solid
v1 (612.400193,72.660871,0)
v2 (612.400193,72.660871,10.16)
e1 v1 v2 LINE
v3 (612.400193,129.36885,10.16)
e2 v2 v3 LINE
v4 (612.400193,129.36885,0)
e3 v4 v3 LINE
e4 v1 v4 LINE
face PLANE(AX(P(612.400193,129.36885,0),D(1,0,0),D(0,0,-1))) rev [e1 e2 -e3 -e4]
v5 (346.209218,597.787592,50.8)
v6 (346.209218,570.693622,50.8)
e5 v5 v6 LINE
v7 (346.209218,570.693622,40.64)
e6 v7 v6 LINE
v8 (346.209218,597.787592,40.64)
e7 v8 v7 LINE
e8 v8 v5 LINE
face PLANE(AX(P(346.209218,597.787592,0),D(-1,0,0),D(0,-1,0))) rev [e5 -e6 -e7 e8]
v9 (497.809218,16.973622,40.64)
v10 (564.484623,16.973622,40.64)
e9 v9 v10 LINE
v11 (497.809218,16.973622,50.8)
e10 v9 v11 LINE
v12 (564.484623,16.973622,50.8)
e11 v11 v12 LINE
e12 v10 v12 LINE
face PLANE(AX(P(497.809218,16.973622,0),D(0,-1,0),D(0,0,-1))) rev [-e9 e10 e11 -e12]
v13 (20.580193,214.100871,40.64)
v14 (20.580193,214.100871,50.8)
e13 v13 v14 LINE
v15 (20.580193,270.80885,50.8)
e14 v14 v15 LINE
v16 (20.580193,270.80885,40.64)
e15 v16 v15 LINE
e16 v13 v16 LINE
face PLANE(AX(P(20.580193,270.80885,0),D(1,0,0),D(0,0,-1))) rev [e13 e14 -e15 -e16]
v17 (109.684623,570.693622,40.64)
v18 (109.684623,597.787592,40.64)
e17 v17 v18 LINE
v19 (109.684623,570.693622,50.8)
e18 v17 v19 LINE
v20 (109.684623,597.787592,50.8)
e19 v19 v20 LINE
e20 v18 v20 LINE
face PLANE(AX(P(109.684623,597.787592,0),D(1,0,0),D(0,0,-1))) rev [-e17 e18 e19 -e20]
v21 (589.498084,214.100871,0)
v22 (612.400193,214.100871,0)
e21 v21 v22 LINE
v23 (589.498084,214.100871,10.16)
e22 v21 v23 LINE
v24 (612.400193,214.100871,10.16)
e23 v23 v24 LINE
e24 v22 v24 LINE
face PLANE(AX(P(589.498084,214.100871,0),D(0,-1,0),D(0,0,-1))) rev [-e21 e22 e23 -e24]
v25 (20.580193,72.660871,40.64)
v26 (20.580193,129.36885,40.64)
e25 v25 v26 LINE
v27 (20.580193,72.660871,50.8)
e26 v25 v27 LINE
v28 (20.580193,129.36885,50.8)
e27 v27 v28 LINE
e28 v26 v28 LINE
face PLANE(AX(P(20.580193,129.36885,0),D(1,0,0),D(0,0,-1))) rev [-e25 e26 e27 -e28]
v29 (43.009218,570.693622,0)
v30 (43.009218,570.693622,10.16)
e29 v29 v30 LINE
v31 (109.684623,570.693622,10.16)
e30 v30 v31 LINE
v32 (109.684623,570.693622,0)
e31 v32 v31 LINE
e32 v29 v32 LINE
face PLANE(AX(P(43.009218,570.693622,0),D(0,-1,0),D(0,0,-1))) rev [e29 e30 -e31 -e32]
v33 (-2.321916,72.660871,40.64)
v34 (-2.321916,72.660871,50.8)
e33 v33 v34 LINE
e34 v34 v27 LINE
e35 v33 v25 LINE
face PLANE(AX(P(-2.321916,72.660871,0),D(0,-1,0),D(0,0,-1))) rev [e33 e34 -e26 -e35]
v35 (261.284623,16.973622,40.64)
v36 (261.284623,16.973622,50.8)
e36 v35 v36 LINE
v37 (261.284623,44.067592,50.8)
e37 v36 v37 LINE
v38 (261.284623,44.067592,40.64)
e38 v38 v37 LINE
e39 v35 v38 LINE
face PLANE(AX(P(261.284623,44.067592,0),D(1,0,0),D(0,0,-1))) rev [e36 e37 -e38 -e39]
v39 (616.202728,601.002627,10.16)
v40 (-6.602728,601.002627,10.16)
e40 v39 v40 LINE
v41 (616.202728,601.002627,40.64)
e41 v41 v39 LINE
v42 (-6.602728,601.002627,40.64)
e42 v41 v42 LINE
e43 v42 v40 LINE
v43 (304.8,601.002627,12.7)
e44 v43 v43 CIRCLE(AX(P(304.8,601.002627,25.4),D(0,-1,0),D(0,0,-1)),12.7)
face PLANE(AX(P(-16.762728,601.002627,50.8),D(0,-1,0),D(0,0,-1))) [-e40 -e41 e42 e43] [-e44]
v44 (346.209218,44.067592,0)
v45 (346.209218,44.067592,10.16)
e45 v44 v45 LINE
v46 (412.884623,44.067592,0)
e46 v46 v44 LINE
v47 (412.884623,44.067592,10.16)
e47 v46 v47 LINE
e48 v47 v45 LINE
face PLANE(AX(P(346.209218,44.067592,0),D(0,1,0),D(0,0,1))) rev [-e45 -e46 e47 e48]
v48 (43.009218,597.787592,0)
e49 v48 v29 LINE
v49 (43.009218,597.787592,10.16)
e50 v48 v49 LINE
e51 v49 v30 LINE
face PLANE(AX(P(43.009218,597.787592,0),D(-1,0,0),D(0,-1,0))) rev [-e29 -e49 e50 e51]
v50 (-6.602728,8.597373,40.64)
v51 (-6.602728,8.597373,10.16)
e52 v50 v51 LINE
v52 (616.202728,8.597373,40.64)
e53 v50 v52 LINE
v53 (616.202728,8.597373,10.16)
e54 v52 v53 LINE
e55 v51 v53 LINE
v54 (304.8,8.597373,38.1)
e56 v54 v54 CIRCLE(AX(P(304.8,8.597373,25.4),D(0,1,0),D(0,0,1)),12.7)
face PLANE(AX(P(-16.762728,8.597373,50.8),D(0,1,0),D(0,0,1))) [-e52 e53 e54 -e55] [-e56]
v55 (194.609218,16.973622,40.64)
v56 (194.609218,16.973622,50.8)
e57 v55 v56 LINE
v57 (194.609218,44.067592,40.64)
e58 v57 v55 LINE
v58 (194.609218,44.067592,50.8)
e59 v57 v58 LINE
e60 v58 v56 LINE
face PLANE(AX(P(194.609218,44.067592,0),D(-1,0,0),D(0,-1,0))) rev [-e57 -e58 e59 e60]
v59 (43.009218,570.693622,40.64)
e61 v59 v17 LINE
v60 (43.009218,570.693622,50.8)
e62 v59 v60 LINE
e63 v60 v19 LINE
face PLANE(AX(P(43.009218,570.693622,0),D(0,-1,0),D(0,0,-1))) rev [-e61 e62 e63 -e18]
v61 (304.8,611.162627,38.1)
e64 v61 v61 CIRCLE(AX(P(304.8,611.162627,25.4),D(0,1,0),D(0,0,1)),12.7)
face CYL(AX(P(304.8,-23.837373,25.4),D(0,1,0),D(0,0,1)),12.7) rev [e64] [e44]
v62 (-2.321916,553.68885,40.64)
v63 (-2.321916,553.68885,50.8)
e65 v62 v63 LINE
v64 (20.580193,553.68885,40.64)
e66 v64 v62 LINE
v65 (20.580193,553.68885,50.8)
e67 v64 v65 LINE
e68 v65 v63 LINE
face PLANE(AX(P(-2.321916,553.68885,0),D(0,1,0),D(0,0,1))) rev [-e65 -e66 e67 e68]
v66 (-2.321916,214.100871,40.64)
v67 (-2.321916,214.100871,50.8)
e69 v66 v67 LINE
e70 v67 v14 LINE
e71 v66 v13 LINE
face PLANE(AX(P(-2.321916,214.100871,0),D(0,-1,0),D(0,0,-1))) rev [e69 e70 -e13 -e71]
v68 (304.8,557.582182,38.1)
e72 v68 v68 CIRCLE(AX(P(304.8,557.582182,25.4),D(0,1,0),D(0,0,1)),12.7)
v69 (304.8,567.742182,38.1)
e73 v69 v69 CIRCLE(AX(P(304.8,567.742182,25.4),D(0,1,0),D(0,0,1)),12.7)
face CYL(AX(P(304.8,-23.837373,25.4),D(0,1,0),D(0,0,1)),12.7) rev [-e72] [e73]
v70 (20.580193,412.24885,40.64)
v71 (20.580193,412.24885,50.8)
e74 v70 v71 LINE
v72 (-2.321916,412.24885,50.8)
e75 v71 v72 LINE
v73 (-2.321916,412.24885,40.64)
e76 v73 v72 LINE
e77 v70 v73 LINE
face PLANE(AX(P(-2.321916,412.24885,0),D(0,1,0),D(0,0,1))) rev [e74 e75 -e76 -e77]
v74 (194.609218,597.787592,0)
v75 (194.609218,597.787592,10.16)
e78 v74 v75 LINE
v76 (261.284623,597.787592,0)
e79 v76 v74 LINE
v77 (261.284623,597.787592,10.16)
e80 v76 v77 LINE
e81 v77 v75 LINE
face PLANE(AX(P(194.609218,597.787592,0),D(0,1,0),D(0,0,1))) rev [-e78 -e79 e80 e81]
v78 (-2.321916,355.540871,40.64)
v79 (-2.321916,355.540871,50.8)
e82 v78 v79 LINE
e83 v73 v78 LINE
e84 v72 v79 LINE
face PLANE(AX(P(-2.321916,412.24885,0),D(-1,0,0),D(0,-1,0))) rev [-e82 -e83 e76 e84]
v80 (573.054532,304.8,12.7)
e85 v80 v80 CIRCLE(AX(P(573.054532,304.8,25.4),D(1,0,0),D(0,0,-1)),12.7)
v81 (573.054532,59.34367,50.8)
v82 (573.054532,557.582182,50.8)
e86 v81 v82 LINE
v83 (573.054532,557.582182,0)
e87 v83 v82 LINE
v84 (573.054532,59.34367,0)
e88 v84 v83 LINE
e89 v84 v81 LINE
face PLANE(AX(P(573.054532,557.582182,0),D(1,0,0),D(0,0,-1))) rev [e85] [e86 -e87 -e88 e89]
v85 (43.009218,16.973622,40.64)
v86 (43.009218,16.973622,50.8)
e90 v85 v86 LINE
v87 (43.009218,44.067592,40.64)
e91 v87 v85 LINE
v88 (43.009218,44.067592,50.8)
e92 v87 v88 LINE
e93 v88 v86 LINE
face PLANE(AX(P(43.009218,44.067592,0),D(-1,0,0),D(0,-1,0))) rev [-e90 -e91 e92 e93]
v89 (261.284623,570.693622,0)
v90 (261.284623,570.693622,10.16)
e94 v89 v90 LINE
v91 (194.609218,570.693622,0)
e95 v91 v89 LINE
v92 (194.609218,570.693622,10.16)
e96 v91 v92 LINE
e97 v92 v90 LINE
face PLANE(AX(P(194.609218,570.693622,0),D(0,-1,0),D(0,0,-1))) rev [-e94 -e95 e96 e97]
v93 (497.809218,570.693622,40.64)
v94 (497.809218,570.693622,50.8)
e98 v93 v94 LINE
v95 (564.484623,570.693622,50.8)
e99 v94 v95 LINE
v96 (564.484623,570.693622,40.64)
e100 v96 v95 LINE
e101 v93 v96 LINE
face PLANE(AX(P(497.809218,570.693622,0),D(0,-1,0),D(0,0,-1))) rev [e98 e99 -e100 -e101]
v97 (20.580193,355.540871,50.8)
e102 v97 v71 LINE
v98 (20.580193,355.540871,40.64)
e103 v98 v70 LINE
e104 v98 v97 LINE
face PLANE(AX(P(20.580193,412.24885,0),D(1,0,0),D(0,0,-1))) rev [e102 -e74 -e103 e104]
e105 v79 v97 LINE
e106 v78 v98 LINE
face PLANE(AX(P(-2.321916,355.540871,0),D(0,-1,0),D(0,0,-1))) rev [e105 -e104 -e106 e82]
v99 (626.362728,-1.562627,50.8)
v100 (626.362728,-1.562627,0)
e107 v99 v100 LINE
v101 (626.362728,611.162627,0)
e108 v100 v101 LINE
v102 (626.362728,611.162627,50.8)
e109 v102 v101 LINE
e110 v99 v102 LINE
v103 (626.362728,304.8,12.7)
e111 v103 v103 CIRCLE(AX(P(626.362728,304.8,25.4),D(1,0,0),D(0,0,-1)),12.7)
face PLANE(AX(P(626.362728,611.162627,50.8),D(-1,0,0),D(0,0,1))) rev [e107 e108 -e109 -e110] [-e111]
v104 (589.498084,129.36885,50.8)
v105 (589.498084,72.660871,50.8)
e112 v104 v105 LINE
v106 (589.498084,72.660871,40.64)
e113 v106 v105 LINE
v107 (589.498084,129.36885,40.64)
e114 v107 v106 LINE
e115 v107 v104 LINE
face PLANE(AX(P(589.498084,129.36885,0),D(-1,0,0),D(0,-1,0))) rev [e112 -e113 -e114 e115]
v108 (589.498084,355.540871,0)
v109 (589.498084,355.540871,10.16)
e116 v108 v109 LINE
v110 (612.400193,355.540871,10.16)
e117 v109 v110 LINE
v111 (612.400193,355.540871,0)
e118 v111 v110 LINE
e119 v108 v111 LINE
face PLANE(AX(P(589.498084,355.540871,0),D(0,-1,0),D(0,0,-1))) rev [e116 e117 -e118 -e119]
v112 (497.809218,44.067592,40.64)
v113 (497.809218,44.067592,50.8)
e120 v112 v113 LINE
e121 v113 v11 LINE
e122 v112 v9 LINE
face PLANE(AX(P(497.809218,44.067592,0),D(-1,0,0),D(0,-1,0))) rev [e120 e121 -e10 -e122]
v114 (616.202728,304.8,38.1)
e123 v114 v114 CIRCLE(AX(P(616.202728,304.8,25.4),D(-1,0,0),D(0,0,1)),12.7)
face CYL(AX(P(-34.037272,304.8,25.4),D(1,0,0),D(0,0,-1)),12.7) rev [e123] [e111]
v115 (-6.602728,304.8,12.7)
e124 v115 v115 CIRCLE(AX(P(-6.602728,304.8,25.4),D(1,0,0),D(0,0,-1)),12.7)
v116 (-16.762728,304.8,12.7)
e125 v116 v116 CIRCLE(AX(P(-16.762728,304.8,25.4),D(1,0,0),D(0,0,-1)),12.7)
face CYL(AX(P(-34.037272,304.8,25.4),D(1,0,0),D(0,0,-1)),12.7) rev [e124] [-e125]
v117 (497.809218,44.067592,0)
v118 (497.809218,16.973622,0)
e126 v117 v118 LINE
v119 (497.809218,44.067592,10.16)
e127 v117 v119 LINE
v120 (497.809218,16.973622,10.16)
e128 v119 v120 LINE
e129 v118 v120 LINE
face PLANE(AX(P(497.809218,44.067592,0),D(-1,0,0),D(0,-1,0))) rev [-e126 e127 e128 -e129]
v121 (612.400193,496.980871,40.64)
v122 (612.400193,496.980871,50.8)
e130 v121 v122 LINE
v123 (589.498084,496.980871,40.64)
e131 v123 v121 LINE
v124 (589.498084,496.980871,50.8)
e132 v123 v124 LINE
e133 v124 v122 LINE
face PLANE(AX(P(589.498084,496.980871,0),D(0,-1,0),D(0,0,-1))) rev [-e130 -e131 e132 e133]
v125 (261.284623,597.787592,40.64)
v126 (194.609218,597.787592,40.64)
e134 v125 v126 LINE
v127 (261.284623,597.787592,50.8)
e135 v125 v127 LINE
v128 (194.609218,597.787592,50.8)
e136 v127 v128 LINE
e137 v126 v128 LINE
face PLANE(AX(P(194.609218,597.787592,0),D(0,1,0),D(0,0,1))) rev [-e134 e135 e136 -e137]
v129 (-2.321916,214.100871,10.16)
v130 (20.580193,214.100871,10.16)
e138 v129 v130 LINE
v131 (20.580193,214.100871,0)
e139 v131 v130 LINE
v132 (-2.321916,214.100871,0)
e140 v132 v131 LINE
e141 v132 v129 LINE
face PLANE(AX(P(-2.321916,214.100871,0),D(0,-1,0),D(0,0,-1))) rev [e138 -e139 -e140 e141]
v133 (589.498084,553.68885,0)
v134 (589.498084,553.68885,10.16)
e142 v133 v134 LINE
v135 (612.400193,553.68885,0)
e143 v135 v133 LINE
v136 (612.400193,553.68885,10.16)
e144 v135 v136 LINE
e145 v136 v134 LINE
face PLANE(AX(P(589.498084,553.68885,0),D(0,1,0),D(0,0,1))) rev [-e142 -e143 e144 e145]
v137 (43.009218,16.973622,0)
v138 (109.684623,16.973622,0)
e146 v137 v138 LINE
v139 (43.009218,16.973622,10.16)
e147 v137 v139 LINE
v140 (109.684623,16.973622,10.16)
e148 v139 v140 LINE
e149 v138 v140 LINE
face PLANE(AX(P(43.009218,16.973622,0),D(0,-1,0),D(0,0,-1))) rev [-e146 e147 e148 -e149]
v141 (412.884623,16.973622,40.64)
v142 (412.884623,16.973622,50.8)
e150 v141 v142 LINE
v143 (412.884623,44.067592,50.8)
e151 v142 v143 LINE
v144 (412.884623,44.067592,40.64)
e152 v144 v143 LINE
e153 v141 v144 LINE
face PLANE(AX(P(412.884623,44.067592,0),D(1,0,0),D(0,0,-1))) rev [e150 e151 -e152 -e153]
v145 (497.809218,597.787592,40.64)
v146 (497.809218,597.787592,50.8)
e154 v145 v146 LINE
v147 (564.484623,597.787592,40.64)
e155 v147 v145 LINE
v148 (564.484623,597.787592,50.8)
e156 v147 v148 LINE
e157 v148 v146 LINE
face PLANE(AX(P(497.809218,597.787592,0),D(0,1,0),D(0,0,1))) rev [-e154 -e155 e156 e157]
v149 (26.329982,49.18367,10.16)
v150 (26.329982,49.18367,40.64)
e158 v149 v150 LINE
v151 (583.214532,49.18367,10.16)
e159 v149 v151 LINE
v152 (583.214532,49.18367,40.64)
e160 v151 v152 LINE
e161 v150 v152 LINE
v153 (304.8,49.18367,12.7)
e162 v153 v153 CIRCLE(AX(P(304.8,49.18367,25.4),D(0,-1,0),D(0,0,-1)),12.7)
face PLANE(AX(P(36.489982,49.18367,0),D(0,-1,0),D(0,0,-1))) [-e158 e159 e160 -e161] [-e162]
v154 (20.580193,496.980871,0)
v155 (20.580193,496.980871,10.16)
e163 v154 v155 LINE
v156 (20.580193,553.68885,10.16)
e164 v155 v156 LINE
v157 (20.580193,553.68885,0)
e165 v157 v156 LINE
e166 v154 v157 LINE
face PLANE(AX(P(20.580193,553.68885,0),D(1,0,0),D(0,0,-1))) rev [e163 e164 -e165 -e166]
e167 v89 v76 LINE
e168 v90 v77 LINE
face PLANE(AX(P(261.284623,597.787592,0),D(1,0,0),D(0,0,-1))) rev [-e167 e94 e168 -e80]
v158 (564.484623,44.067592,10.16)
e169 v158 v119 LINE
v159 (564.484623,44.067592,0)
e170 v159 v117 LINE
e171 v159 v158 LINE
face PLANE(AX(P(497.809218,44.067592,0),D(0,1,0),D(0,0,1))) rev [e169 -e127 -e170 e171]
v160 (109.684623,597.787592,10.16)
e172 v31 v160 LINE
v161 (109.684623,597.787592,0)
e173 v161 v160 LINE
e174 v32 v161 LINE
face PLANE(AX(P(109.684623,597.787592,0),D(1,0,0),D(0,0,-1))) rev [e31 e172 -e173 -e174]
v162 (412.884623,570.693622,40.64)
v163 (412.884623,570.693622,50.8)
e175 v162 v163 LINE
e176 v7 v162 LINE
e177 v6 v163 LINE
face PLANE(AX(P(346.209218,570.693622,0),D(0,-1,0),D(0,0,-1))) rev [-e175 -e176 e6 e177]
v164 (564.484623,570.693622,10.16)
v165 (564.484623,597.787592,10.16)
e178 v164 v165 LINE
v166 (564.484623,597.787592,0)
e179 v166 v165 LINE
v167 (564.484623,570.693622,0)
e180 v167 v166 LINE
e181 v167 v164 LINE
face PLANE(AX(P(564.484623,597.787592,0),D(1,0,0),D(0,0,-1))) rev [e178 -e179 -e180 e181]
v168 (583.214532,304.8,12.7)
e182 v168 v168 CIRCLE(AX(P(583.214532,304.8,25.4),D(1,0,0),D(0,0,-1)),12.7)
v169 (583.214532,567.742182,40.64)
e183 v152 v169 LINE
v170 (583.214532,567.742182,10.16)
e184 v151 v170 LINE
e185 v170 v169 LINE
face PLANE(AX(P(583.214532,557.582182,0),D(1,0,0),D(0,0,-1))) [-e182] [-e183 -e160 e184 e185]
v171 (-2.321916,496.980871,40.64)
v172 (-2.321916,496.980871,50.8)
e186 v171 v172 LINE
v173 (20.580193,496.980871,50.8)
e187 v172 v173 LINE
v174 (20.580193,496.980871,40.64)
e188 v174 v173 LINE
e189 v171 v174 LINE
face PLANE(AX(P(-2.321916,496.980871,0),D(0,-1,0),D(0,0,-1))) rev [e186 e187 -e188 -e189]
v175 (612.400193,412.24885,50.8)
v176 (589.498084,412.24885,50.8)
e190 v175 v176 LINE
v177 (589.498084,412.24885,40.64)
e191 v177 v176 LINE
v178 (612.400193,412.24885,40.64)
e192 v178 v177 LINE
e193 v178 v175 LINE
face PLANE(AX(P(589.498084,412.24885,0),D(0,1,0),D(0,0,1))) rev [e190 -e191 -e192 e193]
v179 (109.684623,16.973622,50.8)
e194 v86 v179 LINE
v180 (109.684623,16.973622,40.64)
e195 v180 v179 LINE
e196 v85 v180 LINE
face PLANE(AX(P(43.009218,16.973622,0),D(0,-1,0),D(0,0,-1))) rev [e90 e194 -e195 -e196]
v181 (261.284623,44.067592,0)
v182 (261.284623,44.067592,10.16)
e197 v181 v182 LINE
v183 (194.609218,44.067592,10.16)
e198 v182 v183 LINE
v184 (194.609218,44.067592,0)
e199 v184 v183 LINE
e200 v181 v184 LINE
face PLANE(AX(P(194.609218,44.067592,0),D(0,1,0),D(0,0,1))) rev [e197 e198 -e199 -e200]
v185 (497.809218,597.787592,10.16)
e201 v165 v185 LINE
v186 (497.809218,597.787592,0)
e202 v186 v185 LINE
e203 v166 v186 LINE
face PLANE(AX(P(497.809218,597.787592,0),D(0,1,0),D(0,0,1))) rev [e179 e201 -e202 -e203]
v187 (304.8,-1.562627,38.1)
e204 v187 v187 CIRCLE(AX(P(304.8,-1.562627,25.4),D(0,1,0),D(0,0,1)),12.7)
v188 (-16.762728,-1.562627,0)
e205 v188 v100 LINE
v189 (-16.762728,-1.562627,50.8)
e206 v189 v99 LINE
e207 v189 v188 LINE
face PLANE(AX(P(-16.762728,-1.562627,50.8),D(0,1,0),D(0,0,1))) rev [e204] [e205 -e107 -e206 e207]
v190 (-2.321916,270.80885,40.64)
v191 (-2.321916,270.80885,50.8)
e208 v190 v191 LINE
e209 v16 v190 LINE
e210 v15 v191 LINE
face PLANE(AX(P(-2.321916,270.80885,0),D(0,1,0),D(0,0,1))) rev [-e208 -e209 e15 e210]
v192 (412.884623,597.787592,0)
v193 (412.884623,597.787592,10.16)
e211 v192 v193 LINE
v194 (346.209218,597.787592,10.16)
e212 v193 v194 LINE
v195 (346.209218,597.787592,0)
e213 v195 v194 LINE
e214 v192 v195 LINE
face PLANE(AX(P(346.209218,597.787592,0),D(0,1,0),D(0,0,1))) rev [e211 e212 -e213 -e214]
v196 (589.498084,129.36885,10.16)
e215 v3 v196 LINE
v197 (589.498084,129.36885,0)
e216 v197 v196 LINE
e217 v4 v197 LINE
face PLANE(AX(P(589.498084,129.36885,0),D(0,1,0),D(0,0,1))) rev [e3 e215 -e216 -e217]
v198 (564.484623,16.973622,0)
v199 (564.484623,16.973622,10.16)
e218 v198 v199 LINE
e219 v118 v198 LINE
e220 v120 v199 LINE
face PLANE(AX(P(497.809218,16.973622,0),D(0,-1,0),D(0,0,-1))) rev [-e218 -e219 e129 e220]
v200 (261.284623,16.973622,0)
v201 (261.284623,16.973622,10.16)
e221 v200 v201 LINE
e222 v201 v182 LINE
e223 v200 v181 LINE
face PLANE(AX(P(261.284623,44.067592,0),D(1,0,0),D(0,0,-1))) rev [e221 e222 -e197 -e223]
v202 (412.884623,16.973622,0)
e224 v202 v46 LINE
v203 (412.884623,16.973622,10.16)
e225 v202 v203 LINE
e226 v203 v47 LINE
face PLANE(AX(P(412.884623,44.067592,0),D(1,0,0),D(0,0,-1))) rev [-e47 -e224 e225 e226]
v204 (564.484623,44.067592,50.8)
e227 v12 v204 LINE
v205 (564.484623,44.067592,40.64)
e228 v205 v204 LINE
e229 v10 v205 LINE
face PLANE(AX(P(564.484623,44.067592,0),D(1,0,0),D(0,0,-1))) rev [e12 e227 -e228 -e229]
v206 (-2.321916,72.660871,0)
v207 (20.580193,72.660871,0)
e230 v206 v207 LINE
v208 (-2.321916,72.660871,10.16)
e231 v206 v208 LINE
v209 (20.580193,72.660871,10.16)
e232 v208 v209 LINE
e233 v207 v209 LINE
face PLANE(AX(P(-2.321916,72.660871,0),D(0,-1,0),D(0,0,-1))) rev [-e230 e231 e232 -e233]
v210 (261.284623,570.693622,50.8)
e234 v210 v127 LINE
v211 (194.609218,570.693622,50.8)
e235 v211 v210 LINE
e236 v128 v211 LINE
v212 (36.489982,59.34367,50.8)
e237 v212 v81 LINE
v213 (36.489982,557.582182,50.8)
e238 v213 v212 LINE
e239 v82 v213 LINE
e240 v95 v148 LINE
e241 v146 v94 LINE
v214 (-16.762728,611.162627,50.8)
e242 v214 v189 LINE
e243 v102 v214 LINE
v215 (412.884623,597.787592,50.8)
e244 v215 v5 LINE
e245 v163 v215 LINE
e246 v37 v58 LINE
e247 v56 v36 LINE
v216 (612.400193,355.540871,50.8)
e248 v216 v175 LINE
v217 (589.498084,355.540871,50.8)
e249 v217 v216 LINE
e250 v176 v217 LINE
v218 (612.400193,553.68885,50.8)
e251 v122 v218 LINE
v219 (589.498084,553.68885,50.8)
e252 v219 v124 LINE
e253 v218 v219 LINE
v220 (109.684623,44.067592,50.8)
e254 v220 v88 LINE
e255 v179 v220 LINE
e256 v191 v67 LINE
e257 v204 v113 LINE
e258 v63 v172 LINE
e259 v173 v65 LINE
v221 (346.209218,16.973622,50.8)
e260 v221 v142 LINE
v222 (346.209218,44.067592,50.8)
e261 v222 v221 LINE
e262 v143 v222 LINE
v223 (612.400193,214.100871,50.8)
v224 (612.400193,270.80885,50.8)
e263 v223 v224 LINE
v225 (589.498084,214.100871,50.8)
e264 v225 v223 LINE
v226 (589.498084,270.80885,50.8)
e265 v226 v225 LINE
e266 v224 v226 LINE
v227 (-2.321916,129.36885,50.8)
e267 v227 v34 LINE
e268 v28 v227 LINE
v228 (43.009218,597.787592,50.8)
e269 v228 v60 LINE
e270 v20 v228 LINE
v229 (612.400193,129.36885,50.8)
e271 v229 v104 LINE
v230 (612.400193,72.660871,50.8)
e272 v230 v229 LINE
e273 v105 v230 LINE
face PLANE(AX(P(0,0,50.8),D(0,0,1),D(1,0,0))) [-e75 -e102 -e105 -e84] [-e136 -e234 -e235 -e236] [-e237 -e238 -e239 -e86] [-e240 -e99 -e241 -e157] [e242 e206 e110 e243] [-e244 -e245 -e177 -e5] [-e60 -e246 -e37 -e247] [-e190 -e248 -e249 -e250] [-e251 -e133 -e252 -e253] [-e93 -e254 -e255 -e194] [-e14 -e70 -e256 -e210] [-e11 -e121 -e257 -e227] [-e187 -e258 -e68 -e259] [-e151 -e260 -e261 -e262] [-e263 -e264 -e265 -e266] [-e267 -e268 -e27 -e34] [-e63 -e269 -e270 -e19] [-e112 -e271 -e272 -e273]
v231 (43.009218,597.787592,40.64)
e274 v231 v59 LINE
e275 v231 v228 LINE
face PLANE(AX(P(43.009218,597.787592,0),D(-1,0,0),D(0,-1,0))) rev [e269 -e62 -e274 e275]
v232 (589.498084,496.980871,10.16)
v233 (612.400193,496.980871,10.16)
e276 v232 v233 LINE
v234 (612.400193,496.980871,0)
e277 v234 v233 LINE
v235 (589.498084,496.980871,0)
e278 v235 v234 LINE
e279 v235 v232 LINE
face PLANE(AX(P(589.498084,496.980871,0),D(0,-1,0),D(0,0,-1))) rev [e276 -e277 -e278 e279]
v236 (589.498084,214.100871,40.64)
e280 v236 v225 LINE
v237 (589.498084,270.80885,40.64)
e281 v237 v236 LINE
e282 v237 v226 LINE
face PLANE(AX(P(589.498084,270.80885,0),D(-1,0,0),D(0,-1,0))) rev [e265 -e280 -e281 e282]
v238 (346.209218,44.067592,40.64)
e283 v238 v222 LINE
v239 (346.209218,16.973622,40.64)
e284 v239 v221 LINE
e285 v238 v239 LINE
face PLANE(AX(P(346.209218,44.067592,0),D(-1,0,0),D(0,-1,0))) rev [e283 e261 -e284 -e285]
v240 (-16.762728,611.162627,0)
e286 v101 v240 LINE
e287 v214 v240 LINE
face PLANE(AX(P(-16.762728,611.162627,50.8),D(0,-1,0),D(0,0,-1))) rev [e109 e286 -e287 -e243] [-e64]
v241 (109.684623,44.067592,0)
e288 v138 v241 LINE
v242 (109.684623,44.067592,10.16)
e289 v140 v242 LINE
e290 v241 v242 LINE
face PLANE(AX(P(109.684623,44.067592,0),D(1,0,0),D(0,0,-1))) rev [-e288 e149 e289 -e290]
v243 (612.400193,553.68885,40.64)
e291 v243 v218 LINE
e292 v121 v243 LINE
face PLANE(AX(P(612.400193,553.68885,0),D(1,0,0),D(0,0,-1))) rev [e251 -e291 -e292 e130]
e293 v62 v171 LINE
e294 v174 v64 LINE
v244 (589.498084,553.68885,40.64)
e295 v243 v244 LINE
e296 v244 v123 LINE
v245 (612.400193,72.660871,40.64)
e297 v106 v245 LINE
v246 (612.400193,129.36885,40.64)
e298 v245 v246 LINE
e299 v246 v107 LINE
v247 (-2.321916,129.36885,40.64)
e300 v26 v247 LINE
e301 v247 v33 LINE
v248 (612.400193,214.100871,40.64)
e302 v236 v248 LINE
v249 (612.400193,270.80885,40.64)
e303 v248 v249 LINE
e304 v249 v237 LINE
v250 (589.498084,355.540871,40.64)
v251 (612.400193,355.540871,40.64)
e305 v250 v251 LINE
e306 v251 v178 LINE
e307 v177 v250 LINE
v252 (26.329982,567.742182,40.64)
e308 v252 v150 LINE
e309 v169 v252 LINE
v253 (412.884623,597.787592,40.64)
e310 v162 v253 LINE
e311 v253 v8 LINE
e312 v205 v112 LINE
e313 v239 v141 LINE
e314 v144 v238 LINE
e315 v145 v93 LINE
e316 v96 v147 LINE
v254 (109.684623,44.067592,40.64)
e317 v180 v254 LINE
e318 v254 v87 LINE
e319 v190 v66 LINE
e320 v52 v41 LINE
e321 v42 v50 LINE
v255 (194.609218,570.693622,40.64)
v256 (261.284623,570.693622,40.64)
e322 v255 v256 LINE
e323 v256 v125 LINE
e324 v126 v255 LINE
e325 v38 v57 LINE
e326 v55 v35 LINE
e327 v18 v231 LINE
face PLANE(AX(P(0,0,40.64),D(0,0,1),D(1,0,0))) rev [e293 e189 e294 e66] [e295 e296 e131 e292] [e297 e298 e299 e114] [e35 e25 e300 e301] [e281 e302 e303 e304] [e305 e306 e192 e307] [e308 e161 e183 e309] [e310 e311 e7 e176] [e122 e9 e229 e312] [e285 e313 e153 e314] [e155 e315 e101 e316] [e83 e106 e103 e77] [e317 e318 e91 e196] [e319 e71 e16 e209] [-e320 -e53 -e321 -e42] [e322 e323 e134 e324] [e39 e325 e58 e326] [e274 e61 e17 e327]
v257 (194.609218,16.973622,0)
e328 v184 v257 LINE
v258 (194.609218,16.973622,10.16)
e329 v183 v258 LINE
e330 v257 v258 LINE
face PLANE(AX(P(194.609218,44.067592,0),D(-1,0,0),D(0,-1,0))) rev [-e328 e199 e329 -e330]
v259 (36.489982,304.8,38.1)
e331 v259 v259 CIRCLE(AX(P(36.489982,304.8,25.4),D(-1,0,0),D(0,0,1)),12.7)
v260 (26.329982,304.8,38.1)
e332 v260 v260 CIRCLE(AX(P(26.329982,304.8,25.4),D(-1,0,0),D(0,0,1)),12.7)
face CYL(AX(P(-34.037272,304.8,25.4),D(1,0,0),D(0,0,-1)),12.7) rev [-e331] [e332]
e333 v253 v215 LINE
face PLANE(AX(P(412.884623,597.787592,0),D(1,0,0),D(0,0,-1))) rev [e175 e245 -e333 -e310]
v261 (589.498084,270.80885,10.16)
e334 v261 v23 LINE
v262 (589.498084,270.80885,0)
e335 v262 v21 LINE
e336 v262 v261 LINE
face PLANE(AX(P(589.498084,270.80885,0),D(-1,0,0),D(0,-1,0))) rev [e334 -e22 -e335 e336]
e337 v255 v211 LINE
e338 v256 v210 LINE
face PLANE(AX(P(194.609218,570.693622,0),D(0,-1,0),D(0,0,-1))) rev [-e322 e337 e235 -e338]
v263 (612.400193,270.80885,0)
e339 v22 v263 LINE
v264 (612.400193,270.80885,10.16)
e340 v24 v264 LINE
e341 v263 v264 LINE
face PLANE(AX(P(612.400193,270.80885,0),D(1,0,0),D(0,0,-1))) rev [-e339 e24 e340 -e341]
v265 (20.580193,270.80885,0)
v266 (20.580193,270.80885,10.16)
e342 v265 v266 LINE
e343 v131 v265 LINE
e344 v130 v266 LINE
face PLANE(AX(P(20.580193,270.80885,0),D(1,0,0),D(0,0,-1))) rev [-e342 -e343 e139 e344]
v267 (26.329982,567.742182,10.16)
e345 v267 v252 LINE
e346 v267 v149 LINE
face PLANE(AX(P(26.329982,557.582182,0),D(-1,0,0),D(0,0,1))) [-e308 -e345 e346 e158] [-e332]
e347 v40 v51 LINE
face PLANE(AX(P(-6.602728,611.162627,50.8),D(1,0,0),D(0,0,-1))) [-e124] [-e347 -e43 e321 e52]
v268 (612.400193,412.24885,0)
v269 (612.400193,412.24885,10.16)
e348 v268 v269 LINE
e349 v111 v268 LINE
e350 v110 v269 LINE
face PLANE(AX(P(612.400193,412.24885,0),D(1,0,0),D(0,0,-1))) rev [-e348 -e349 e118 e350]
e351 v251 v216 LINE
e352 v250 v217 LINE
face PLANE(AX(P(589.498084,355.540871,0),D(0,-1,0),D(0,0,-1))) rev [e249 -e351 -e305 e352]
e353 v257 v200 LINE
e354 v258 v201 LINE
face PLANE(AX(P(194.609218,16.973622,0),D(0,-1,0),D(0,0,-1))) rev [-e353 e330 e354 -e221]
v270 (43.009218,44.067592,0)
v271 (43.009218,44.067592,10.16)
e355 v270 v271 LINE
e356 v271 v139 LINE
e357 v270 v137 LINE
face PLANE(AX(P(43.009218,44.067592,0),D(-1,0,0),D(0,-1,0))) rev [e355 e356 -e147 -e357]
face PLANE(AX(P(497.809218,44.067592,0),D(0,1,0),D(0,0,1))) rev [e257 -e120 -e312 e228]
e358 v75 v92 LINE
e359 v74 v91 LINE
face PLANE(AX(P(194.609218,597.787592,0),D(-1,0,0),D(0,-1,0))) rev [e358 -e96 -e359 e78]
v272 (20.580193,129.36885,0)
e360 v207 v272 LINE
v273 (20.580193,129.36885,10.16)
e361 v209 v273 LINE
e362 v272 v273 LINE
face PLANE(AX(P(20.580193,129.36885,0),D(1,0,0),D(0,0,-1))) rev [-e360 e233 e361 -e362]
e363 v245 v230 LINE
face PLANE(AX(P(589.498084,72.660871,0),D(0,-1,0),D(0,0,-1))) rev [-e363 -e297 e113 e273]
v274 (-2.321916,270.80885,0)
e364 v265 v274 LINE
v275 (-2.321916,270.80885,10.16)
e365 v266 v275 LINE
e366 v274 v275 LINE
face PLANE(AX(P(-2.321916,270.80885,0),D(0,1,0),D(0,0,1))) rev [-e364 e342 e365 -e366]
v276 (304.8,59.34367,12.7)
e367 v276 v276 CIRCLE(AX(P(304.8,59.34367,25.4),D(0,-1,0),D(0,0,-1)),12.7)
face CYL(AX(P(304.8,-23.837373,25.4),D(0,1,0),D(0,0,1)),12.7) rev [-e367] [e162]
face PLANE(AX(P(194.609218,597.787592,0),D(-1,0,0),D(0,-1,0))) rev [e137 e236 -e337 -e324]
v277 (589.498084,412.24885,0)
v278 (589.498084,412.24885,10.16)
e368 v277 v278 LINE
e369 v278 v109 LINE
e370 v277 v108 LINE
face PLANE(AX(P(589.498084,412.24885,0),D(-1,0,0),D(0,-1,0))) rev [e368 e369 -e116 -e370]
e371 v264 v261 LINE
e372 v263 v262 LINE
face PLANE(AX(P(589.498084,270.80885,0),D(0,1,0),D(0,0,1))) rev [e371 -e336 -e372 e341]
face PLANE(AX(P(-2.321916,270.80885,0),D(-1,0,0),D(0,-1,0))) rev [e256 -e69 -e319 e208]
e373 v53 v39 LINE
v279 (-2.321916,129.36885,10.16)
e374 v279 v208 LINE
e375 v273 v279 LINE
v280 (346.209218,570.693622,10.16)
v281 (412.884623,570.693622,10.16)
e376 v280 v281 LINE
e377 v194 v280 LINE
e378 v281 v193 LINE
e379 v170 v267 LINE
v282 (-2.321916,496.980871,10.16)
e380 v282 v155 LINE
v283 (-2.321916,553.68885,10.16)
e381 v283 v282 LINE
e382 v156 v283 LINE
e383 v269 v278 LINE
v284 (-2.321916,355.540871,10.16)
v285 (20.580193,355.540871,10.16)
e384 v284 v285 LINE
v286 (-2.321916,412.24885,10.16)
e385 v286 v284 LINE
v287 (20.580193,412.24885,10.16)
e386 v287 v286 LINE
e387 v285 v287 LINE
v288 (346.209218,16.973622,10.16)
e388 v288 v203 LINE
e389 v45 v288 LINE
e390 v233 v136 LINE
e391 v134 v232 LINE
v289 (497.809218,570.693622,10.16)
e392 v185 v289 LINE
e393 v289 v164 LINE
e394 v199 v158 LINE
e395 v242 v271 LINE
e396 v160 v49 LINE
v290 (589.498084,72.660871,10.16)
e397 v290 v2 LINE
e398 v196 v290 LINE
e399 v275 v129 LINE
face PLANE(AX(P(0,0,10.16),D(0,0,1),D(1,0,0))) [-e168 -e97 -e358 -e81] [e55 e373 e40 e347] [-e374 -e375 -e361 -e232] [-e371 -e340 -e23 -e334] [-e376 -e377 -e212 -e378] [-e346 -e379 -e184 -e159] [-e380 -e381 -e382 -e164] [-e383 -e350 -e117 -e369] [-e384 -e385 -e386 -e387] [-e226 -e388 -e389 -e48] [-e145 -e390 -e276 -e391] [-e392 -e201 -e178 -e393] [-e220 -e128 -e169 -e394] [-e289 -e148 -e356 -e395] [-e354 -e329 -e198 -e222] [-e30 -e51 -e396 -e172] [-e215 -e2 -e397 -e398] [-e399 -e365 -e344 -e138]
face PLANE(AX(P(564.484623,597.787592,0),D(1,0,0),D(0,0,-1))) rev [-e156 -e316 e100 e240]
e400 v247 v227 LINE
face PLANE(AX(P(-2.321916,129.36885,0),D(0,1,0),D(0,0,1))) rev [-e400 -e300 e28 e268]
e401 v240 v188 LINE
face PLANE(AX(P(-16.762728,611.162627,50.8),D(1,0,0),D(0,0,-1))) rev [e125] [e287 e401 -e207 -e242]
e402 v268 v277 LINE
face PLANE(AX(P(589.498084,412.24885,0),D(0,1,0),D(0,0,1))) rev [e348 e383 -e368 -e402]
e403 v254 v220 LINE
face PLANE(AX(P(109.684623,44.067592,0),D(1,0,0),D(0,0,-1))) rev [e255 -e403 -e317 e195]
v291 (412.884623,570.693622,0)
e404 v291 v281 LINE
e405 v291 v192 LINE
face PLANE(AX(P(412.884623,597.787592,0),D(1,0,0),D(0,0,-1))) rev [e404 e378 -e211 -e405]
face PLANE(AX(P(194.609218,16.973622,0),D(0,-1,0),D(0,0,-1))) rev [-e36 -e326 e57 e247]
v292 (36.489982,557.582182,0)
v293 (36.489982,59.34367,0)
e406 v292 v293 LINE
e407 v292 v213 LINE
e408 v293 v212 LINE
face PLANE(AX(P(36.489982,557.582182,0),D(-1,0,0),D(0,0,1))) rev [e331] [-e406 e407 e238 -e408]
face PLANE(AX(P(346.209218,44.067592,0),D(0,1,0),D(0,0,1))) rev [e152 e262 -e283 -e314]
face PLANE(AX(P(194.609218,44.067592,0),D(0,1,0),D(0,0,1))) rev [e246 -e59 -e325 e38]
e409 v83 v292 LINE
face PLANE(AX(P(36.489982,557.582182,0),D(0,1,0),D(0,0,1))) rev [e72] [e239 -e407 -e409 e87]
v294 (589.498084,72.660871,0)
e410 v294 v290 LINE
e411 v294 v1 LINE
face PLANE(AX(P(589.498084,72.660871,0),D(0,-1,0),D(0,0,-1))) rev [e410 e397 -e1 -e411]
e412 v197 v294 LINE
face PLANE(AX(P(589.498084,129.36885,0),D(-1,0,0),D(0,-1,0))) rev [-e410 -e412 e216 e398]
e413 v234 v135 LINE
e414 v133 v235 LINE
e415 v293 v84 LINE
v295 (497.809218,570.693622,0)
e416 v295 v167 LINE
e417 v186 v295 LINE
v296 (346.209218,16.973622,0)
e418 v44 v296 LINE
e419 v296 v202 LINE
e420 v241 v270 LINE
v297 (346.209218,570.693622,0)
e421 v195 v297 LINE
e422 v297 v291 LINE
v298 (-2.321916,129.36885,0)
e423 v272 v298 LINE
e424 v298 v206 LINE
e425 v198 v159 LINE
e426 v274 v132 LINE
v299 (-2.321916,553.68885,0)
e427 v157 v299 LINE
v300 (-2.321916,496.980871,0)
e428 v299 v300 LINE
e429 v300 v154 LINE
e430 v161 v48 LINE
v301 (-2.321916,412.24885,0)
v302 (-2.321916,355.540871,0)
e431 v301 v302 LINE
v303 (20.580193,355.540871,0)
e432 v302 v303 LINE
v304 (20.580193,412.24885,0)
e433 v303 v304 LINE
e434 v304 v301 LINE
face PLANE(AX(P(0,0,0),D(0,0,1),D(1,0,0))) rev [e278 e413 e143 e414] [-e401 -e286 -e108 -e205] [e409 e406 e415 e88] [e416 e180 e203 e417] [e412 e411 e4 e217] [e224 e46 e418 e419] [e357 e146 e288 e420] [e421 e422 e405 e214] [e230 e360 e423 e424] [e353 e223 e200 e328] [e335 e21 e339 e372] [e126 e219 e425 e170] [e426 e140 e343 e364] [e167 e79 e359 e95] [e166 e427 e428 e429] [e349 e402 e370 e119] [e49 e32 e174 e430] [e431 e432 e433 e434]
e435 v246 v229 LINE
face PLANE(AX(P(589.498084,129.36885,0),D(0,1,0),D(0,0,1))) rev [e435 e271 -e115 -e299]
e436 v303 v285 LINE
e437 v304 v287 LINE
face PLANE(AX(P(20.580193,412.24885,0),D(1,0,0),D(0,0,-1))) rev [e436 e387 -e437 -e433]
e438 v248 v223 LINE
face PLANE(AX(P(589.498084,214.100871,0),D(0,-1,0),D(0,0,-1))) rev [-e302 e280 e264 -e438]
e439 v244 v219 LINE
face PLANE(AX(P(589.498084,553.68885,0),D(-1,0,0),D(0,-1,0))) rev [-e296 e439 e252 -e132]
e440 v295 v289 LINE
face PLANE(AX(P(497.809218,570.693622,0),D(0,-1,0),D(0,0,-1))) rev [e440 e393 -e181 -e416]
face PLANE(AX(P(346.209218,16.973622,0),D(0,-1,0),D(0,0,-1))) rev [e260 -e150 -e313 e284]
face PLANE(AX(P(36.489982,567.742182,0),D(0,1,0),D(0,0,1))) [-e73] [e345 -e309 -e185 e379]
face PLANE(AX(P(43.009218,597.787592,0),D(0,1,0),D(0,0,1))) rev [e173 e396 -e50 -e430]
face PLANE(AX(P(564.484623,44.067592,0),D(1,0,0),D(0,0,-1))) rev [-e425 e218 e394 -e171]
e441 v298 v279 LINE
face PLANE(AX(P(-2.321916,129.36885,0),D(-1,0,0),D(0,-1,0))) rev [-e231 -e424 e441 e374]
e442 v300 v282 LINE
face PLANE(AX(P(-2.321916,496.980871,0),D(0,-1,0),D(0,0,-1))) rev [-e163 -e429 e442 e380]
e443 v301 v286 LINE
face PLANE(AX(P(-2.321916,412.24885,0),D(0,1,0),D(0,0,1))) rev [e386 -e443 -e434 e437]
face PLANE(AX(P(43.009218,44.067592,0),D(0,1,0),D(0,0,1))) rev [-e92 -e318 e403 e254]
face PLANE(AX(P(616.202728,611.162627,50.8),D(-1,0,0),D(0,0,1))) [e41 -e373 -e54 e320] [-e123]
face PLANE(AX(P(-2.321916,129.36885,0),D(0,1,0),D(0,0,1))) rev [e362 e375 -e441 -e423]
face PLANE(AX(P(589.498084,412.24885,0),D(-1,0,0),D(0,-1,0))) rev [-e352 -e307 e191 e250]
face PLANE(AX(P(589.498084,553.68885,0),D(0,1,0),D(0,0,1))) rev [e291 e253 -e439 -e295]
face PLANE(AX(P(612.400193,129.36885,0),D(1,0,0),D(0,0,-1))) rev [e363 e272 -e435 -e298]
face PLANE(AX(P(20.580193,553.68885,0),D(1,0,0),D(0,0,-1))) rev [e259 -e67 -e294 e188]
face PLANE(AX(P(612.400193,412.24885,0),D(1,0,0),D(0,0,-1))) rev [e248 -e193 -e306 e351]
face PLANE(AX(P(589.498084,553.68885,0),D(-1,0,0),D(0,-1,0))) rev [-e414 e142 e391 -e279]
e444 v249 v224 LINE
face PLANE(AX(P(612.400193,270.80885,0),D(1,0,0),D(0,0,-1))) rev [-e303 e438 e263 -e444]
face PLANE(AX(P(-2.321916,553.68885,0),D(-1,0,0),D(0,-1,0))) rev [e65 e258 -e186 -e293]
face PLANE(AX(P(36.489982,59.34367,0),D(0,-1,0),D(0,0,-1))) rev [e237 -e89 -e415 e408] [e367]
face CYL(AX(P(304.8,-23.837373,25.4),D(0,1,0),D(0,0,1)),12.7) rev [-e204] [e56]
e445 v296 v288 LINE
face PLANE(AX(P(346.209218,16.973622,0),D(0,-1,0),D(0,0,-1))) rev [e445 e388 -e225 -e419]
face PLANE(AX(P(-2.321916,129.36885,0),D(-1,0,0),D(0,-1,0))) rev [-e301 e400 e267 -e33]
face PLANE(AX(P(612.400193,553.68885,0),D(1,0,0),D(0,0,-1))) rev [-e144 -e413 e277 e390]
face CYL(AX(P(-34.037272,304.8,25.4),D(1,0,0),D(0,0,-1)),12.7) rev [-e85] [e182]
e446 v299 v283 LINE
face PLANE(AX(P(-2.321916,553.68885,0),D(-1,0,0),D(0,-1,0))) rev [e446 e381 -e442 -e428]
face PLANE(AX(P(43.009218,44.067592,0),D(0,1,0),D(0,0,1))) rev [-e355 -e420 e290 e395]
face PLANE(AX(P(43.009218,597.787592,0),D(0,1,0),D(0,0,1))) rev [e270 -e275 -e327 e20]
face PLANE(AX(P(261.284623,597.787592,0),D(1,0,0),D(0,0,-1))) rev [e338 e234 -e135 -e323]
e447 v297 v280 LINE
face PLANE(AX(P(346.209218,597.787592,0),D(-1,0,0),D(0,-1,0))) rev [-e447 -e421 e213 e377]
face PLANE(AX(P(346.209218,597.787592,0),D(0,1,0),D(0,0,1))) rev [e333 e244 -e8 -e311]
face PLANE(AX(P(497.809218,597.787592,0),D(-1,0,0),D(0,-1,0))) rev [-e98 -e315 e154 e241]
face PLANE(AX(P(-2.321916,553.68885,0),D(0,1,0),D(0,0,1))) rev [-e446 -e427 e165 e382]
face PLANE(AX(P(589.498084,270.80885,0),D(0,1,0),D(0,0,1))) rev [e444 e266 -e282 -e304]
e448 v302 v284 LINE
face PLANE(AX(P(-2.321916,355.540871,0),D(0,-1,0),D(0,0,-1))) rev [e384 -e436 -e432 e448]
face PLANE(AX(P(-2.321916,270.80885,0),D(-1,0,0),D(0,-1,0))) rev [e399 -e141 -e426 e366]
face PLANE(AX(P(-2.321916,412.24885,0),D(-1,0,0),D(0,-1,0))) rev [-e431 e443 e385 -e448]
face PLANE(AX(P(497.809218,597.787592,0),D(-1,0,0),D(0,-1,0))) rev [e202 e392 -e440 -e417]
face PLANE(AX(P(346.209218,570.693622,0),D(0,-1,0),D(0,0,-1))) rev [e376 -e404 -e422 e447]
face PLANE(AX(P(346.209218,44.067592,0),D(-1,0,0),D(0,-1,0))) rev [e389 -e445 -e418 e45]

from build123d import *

# Parameters (mm, degrees)
SKETCH1_W            = 643.125455594
SKETCH1_H            = 612.725254334
BOSS_EXTRUDE1_DEPTH  = 50.8
SKETCH3_W            = 536.564550572
SKETCH3_H            = 498.238511246
CUT_EXTRUDE2_DEPTH   = 50.8
SHELL5_START         = -6.602727797
SHELL5_OUTLINE_W     = 40.586297515
SHELL5_OUTLINE_H     = 30.48
SHELL5_OUTLINE_W_2   = 33.260445573
SHELL5_DEPTH         = 622.805455594
SHELL5_START_2       = 583.214532361
SHELL5_2_OUTLINE_W   = 518.558511246
SHELL5_2_OUTLINE_H   = 30.48
SHELL5_2_DEPTH       = 32.988195436
SHELL5_3_OUTLINE_W   = 518.558511246
SHELL5_3_OUTLINE_H   = 30.48
SHELL5_3_DEPTH       = 32.932709586
SKETCH7_W            = 66.675404896
SKETCH7_H            = 27.093969604
CUT_EXTRUDE3_DEPTH   = 50.8
LPATTERN1_COUNT      = 4
LPATTERN1_PITCH      = 151.6
LPATTERN1_COUNT_DIR2 = 2
LPATTERN1_PITCH_DIR2 = 553.72
SKETCH8_W            = 22.902108828
SKETCH8_H            = 56.707978581
CUT_EXTRUDE4_DEPTH   = 50.8
LPATTERN2_COUNT      = 4
LPATTERN2_PITCH      = 141.44
LPATTERN2_COUNT_DIR2 = 2
LPATTERN2_PITCH_DIR2 = 591.82
SKETCH11_R           = 12.7
CUT_EXTRUDE5_DEPTH   = 635
SKETCH12_R           = 12.7
CUT_EXTRUDE7_DEPTH   = 660.4


# Read off the part's stored shape, not the designer's step: Shell5
with BuildPart() as part:
    # Sketch1 → Boss-Extrude1 (new body)
    with BuildSketch(Plane.XY):
        with Locations((304.8, 304.8)):
            Rectangle(SKETCH1_W, SKETCH1_H)
    extrude(amount=BOSS_EXTRUDE1_DEPTH)

    # Sketch3 → Cut-Extrude2 (cut)
    with BuildSketch(Plane.XY.offset(50.8)):
        with Locations((304.772257075, 308.462925971)):
            Rectangle(SKETCH3_W, SKETCH3_H)
    extrude(amount=-CUT_EXTRUDE2_DEPTH, mode=Mode.SUBTRACT)

    # Shell5 outline → Shell5 (cut)
    with BuildSketch(Plane.YZ.offset(SHELL5_START)):
        with Locations((28.890521591, 25.4)):
            Rectangle(SHELL5_OUTLINE_W, SHELL5_OUTLINE_H)
        with Locations((584.372404381, 25.4)):
            Rectangle(SHELL5_OUTLINE_W_2, SHELL5_OUTLINE_H)
    extrude(amount=SHELL5_DEPTH, mode=Mode.SUBTRACT)

    # Shell5 2 outline → Shell5 2 (cut)
    with BuildSketch(Plane.YZ.offset(SHELL5_START_2)):
        with Locations((308.462925971, 25.4)):
            Rectangle(SHELL5_2_OUTLINE_W, SHELL5_2_OUTLINE_H)
    extrude(amount=SHELL5_2_DEPTH, mode=Mode.SUBTRACT)

    # Shell5 3 outline → Shell5 3 (cut)
    with BuildSketch(Plane.YZ.offset(SHELL5_START)):
        with Locations((308.462925971, 25.4)):
            Rectangle(SHELL5_3_OUTLINE_W, SHELL5_3_OUTLINE_H)
    extrude(amount=SHELL5_3_DEPTH, mode=Mode.SUBTRACT)

    # Sketch7 → Cut-Extrude3 (cut)
    with BuildSketch(Plane.XY.offset(50.8)):
        with Locations((76.34692027, 584.240607078)):
            Rectangle(SKETCH7_W, SKETCH7_H)
    cut_extrude3 = extrude(amount=-CUT_EXTRUDE3_DEPTH, mode=Mode.SUBTRACT)

    # LPattern1: Cut-Extrude3 4 × 2
    with Locations(*[(i * LPATTERN1_PITCH, -j * LPATTERN1_PITCH_DIR2, 0) for i in range(LPATTERN1_COUNT) for j in range(LPATTERN1_COUNT_DIR2) if (i, j) != (0, 0)]):
        add(cut_extrude3, mode=Mode.SUBTRACT)

    # Sketch8 → Cut-Extrude4 (cut)
    with BuildSketch(Plane.XY.offset(50.8)):
        with Locations((9.129138523, 525.334860242)):
            Rectangle(SKETCH8_W, SKETCH8_H)
    cut_extrude4 = extrude(amount=-CUT_EXTRUDE4_DEPTH, mode=Mode.SUBTRACT)

    # LPattern2: Cut-Extrude4 4 × 2
    with Locations(*[(j * LPATTERN2_PITCH_DIR2, -i * LPATTERN2_PITCH, 0) for i in range(LPATTERN2_COUNT) for j in range(LPATTERN2_COUNT_DIR2) if (i, j) != (0, 0)]):
        add(cut_extrude4, mode=Mode.SUBTRACT)

    # Sketch11 → Cut-Extrude5 (cut)
    with BuildSketch(Plane(origin=(0, 611.162627167, 0), x_dir=(1, 0, 0), z_dir=(0, 1, 0))):
        with Locations(Location((304.8, -25.4, 0), (0, 0, 270))):
            Circle(SKETCH11_R)
    extrude(amount=-CUT_EXTRUDE5_DEPTH, mode=Mode.SUBTRACT)

    # Sketch12 → Cut-Extrude7 (cut)
    with BuildSketch(Plane(origin=(626.362727797, 0, 0), x_dir=(0, 0, -1), z_dir=(1, 0, 0))):
        with Locations(Location((-25.4, 304.8, 0), (0, 0, 180))):
            Circle(SKETCH12_R)
    extrude(amount=-CUT_EXTRUDE7_DEPTH, mode=Mode.SUBTRACT)


solid = part.part
